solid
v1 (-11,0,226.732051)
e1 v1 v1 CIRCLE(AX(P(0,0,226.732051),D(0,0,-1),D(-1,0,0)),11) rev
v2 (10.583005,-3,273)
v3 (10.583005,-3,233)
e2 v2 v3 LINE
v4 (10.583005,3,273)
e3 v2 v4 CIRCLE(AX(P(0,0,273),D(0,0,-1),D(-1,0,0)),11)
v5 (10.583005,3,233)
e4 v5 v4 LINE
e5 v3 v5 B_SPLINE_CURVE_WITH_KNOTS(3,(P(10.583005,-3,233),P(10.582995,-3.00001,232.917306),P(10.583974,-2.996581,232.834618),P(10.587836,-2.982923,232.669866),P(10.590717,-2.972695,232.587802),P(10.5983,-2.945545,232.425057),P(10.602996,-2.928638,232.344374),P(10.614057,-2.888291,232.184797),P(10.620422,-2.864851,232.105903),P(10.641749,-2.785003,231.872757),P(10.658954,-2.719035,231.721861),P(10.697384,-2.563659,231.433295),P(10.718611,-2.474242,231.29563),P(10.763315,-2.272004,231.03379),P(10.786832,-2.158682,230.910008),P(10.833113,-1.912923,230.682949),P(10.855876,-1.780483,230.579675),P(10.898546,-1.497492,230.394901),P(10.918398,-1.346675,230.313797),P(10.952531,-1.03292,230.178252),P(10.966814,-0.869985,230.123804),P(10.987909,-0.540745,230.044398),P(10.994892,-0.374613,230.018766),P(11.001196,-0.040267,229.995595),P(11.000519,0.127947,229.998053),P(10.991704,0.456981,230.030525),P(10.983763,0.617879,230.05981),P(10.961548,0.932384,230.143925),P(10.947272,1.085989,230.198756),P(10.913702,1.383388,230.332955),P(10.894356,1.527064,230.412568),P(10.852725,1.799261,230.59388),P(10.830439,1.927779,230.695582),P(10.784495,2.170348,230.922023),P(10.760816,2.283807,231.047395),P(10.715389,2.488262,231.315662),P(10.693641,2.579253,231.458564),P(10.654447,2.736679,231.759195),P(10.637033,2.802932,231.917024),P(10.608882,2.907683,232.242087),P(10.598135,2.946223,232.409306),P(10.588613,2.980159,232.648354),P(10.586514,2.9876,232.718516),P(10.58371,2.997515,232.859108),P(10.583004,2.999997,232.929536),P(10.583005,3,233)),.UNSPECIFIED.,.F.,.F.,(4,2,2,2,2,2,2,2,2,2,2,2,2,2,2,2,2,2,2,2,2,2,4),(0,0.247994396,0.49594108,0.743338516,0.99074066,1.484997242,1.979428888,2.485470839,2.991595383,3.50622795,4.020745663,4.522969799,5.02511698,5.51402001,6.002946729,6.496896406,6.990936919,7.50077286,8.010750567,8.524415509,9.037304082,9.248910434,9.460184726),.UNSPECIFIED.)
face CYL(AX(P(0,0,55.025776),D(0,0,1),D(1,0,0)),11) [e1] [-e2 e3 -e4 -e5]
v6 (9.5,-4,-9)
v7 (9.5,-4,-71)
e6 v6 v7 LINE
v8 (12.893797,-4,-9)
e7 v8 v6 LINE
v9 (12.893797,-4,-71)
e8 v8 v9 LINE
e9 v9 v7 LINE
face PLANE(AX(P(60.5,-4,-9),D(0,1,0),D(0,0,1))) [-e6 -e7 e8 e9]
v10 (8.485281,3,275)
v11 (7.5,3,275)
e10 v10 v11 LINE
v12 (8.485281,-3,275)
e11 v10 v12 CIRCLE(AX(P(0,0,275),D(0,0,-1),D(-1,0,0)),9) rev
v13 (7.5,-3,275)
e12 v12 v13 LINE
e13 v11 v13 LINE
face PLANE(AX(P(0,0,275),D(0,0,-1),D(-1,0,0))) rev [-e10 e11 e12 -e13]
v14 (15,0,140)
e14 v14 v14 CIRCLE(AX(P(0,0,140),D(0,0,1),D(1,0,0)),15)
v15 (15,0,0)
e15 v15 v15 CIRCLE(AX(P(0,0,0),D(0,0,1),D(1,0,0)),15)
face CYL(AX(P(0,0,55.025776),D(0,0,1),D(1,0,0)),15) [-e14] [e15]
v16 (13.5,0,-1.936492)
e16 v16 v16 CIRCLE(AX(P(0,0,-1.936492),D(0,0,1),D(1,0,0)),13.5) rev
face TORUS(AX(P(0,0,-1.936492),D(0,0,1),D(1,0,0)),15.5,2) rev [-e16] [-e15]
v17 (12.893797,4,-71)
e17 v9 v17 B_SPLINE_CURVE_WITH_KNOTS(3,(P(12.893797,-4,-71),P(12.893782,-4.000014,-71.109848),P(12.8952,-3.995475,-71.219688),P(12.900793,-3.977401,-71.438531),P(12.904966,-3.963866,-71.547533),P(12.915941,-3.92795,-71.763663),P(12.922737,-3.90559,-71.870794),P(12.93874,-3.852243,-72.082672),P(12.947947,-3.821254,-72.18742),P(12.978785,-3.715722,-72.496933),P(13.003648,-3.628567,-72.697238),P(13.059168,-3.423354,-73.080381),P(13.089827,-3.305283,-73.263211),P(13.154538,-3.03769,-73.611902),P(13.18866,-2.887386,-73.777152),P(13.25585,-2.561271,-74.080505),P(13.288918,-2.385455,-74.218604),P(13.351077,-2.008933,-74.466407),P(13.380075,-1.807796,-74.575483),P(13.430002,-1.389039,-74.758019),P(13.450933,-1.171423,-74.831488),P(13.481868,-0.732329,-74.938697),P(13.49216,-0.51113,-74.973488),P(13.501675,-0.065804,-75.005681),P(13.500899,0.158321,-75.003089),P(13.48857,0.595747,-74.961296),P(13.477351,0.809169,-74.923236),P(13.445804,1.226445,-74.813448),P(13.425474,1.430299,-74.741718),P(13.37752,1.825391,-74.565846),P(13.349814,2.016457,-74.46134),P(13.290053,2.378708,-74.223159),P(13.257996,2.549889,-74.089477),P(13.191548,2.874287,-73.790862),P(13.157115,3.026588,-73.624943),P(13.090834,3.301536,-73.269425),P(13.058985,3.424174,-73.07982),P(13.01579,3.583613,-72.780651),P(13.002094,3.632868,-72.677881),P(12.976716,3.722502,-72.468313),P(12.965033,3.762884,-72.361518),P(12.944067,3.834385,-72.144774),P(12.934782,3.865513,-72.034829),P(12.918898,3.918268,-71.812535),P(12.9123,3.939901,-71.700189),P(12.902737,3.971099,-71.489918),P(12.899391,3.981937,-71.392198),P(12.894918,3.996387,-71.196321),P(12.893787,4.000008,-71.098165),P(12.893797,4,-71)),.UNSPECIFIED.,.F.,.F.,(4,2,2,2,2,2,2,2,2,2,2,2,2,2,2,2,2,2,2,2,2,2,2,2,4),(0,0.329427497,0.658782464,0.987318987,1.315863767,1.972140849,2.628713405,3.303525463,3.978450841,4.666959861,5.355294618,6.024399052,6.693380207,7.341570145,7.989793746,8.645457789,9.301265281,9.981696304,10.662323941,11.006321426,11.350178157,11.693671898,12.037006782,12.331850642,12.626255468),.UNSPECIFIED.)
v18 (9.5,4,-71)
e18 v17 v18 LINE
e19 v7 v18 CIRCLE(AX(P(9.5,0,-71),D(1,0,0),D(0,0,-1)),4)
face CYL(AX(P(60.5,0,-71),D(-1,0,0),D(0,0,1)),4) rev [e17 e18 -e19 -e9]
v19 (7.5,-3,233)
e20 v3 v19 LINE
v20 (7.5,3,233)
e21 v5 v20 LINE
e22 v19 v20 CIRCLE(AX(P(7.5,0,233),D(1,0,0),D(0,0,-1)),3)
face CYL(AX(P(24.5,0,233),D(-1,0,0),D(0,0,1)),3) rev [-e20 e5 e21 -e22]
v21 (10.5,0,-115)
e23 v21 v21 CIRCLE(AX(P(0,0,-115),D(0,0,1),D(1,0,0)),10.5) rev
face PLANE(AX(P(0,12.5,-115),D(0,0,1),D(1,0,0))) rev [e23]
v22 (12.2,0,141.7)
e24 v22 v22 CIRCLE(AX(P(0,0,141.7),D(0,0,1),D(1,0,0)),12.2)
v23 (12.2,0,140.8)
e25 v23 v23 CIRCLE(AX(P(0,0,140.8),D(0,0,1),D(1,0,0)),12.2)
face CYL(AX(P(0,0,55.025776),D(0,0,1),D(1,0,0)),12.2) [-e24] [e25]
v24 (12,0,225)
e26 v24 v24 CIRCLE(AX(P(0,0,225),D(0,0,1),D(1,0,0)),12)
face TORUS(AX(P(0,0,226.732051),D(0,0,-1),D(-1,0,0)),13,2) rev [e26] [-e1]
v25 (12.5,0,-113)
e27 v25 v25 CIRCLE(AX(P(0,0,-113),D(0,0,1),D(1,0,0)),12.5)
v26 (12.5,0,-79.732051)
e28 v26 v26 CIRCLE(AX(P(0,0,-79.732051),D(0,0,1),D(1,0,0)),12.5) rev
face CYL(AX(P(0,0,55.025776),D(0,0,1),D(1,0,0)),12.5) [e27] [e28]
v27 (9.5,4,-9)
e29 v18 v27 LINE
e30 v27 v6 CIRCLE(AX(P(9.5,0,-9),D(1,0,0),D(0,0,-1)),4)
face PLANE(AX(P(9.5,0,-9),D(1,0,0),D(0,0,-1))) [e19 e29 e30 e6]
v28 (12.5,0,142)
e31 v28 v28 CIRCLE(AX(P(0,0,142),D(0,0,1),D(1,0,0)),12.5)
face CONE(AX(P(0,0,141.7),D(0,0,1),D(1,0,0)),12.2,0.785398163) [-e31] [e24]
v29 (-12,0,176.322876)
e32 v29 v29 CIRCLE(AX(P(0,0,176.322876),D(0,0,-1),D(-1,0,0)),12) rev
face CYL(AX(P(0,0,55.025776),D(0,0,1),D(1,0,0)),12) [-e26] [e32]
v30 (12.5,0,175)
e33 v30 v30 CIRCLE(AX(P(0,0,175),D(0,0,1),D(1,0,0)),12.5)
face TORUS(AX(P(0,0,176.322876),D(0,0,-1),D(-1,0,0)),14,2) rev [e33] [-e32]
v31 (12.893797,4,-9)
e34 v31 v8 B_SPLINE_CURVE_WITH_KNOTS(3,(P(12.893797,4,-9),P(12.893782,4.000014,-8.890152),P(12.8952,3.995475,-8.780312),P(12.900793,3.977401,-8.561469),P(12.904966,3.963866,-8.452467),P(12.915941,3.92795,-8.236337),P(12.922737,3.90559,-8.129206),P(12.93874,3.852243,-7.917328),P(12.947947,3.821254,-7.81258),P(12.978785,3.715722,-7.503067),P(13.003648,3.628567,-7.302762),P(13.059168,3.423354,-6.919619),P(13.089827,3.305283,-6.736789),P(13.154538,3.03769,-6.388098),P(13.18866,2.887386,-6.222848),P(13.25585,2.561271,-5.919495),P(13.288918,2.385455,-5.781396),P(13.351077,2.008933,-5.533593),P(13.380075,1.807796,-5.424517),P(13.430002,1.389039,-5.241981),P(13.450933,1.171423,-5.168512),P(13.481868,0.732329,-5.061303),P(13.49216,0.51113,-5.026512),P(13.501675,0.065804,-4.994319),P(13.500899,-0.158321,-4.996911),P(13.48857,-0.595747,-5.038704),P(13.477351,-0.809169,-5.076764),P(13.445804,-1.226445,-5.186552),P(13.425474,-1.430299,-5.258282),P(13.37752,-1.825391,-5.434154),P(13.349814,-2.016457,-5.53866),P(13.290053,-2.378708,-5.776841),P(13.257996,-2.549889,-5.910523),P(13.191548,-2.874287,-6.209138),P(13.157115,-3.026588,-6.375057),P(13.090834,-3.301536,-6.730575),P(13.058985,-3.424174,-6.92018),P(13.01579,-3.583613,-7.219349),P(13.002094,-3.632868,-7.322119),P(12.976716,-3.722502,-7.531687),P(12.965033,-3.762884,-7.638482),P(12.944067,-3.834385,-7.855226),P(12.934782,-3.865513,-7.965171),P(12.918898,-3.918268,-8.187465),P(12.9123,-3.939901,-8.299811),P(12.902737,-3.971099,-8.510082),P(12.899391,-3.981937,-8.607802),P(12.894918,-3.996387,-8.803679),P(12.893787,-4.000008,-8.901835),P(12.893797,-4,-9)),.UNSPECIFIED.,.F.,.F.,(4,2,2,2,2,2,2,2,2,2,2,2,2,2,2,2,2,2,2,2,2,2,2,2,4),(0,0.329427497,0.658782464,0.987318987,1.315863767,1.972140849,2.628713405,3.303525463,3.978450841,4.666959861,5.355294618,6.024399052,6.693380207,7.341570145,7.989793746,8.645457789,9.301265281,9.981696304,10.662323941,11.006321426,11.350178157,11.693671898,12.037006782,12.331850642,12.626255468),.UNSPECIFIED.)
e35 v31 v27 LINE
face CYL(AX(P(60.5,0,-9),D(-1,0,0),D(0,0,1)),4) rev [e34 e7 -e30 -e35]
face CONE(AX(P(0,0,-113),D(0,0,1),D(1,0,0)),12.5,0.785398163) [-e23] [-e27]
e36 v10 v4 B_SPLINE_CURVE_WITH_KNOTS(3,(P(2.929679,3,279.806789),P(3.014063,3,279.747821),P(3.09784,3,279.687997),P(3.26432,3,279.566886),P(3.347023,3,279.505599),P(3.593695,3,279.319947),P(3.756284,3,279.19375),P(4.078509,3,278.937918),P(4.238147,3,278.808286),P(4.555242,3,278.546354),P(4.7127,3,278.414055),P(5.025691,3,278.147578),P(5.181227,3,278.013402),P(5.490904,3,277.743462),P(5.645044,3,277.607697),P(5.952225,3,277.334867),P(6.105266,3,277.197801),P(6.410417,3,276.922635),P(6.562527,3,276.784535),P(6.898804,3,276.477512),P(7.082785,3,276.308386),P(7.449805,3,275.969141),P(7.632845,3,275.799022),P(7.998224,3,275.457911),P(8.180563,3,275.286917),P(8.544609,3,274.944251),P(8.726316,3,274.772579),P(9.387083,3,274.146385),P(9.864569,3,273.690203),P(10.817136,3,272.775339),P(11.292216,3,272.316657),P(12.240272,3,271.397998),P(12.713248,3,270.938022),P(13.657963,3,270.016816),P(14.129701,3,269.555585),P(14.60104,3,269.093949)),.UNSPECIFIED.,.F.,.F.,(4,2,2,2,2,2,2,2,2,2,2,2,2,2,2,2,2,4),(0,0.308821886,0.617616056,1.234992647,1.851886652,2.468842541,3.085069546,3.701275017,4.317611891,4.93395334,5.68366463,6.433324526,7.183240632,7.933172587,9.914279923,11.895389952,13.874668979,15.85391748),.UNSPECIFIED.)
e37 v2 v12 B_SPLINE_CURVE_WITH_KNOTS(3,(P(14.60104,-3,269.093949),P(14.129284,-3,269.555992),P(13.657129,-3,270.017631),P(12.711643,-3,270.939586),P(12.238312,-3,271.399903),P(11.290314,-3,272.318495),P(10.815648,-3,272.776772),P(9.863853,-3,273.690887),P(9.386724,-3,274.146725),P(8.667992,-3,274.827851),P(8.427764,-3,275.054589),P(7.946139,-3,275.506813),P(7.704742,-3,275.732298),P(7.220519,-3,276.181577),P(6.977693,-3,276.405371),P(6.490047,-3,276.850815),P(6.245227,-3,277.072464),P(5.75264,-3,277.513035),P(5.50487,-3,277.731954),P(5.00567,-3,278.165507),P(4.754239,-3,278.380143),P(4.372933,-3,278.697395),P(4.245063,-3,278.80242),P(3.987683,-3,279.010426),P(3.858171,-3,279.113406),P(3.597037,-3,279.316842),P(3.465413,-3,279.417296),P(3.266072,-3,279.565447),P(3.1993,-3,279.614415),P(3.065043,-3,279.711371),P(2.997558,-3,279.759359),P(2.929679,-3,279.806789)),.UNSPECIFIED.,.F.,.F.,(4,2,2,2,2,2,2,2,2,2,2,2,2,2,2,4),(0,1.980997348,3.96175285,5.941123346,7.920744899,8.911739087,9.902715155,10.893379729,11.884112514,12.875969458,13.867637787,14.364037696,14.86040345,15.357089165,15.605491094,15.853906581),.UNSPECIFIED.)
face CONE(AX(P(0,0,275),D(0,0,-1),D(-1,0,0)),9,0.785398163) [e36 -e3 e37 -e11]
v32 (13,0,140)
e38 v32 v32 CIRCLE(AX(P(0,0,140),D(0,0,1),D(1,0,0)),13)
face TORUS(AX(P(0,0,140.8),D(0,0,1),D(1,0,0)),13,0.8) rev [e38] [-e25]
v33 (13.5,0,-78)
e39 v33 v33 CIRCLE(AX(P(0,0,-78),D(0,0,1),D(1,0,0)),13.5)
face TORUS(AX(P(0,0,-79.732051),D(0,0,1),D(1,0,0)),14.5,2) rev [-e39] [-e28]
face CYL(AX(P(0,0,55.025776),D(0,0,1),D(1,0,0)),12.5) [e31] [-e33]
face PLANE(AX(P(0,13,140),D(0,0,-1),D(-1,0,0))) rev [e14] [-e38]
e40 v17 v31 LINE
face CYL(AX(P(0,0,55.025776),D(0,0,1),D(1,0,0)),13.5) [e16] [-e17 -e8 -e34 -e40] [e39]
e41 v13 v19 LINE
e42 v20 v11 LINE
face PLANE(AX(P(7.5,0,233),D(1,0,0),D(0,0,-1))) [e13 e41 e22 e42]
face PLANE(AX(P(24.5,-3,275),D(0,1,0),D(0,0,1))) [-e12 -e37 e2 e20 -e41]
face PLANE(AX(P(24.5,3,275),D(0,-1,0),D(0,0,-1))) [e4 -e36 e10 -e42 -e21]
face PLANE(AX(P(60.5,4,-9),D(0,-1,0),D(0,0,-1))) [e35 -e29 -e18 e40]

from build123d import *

# Parameters (mm, degrees)
FILLET_1_R          = 2
CHAMFER_1_SIZE      = 2
CUT_EXTRUDE_1_DEPTH = 17
CUT_EXTRUDE_2_DEPTH = 51


with BuildPart() as part:
    # 草图1 → 旋转1 (revolve)
    with BuildSketch(Plane(origin=(0, 0, 0), x_dir=(0, 0, -1), z_dir=(1, 0, 0)), mode=Mode.PRIVATE) as revolve_1_sk:
        with BuildLine():
            Line((-275, 0), (-275, 11))
            Line((-275, 11), (-225, 11))
            Line((-225, 11), (-225, 12))
            Line((-225, 12), (-175, 12))
            Line((-175, 12), (-175, 12.5))
            Line((-175, 12.5), (-142, 12.5))
            Line((-142, 12.5), (-141.7, 12.2))
            Line((-141.7, 12.2), (-140.8, 12.2))
            ThreePointArc((-140.8, 12.2), (-140.234314575, 12.434314575), (-140, 13))
            Line((-140, 13), (-140, 15))
            Line((-140, 15), (0, 15))
            Line((0, 15), (0, 13.5))
            Line((0, 13.5), (78, 13.5))
            Line((78, 13.5), (78, 12.5))
            Line((78, 12.5), (115, 12.5))
            Line((115, 12.5), (115, 0))
            Line((115, 0), (-275, 0))
        make_face()
    revolve(revolve_1_sk.sketch.rotate(Axis((0, 0, 55.025776128), (0, 0, -1)), 90), axis=Axis((0, 0, 55.025776128), (0, 0, -1)))

    # 圆角1
    # the kernel refuses this fillet: 2 mm, written as the material it adds along each edge
    with BuildSketch(Plane(origin=(0, 0, -78), x_dir=(1, 0, 0), z_dir=(0, 1, 0))) as fillet_1_piece_1:
        with BuildLine():
            CenterArc((14.5, 1.732050808), FILLET_1_R, 180, 60)
            Line((12.5, 1.732050808), (12.46, 1.732050808))
            Line((12.46, 1.732050808), (12.46, 0))
            Line((12.46, 0), (12.5, -0.04))
            ThreePointArc((12.5, -0.04), (13, -0.04), (13.48, -0.034641016))
            Line((13.48, -0.034641016), (13.5, 0))
        make_face()
    revolve(axis=Axis((0, 0, -78), (0, 0, -1)))
    with BuildSketch(Plane(origin=(0, 0, 0), x_dir=(1, 0, 0), z_dir=(0, 1, 0))) as fillet_1_piece_2:
        with BuildLine():
            CenterArc((15.5, 1.936491673), FILLET_1_R, 180, 75.522487814)
            Line((13.5, 1.936491673), (13.46, 1.936491673))
            Line((13.46, 1.936491673), (13.46, 0))
            Line((13.46, 0), (13.5, -0.04))
            ThreePointArc((13.5, -0.04), (14.25, -0.04), (14.99, -0.038729833))
            Line((14.99, -0.038729833), (15, 0))
        make_face()
    revolve(axis=Axis((0, 0, 0), (0, 0, -1)))
    with BuildSketch(Plane(origin=(0, 0, 175), x_dir=(1, 0, 0), z_dir=(0, 1, 0))) as fillet_1_piece_3:
        with BuildLine():
            CenterArc((14, -1.322875656), FILLET_1_R, 138.590377891, 41.409622109)
            Line((12.5, 0), (12.47, 0.026457513))
            ThreePointArc((12.47, 0.026457513), (12.25, 0.04), (12, 0.04))
            Line((12, 0.04), (11.96, 0))
            Line((11.96, 0), (11.96, -1.322875656))
            Line((11.96, -1.322875656), (12, -1.322875656))
        make_face()
    revolve(axis=Axis((0, 0, 175), (0, 0, -1)))
    with BuildSketch(Plane(origin=(0, 0, 225), x_dir=(1, 0, 0), z_dir=(0, 1, 0))) as fillet_1_piece_4:
        with BuildLine():
            CenterArc((13, -1.732050808), FILLET_1_R, 120, 60)
            Line((12, 0), (11.98, 0.034641016))
            ThreePointArc((11.98, 0.034641016), (11.5, 0.04), (11, 0.04))
            Line((11, 0.04), (10.96, 0))
            Line((10.96, 0), (10.96, -1.732050808))
            Line((10.96, -1.732050808), (11, -1.732050808))
        make_face()
    revolve(axis=Axis((0, 0, 225), (0, 0, -1)))

    # 倒角1
    chamfer_1_edges = [part.edges().sort_by_distance(p)[0] for p in [
        (-12.5, 0, -115),
        (-11, 0, 275),
    ]]
    chamfer(chamfer_1_edges, length=CHAMFER_1_SIZE)

    # 草图2 → 切除-拉伸1 (cut)
    with BuildSketch(Plane(origin=(7.5, 0, 0), x_dir=(0, 0, -1), z_dir=(1, 0, 0))):
        with BuildLine():
            Line((-275, 3), (-233, 3))
            ThreePointArc((-233, 3), (-230, 0), (-233, -3))
            Line((-233, -3), (-275, -3))
            Line((-275, -3), (-275, 3))
        make_face()
    extrude(amount=CUT_EXTRUDE_1_DEPTH, mode=Mode.SUBTRACT)

    # 草图3 → 切除-拉伸2 (cut)
    with BuildSketch(Plane(origin=(9.5, 0, 0), x_dir=(0, 0, -1), z_dir=(1, 0, 0))):
        with BuildLine():
            Line((9, 4), (71, 4))
            ThreePointArc((71, 4), (75, 0), (71, -4))
            Line((71, -4), (9, -4))
            ThreePointArc((9, -4), (5, 0), (9, 4))
        make_face()
    extrude(amount=CUT_EXTRUDE_2_DEPTH, mode=Mode.SUBTRACT)


solid = part.part
